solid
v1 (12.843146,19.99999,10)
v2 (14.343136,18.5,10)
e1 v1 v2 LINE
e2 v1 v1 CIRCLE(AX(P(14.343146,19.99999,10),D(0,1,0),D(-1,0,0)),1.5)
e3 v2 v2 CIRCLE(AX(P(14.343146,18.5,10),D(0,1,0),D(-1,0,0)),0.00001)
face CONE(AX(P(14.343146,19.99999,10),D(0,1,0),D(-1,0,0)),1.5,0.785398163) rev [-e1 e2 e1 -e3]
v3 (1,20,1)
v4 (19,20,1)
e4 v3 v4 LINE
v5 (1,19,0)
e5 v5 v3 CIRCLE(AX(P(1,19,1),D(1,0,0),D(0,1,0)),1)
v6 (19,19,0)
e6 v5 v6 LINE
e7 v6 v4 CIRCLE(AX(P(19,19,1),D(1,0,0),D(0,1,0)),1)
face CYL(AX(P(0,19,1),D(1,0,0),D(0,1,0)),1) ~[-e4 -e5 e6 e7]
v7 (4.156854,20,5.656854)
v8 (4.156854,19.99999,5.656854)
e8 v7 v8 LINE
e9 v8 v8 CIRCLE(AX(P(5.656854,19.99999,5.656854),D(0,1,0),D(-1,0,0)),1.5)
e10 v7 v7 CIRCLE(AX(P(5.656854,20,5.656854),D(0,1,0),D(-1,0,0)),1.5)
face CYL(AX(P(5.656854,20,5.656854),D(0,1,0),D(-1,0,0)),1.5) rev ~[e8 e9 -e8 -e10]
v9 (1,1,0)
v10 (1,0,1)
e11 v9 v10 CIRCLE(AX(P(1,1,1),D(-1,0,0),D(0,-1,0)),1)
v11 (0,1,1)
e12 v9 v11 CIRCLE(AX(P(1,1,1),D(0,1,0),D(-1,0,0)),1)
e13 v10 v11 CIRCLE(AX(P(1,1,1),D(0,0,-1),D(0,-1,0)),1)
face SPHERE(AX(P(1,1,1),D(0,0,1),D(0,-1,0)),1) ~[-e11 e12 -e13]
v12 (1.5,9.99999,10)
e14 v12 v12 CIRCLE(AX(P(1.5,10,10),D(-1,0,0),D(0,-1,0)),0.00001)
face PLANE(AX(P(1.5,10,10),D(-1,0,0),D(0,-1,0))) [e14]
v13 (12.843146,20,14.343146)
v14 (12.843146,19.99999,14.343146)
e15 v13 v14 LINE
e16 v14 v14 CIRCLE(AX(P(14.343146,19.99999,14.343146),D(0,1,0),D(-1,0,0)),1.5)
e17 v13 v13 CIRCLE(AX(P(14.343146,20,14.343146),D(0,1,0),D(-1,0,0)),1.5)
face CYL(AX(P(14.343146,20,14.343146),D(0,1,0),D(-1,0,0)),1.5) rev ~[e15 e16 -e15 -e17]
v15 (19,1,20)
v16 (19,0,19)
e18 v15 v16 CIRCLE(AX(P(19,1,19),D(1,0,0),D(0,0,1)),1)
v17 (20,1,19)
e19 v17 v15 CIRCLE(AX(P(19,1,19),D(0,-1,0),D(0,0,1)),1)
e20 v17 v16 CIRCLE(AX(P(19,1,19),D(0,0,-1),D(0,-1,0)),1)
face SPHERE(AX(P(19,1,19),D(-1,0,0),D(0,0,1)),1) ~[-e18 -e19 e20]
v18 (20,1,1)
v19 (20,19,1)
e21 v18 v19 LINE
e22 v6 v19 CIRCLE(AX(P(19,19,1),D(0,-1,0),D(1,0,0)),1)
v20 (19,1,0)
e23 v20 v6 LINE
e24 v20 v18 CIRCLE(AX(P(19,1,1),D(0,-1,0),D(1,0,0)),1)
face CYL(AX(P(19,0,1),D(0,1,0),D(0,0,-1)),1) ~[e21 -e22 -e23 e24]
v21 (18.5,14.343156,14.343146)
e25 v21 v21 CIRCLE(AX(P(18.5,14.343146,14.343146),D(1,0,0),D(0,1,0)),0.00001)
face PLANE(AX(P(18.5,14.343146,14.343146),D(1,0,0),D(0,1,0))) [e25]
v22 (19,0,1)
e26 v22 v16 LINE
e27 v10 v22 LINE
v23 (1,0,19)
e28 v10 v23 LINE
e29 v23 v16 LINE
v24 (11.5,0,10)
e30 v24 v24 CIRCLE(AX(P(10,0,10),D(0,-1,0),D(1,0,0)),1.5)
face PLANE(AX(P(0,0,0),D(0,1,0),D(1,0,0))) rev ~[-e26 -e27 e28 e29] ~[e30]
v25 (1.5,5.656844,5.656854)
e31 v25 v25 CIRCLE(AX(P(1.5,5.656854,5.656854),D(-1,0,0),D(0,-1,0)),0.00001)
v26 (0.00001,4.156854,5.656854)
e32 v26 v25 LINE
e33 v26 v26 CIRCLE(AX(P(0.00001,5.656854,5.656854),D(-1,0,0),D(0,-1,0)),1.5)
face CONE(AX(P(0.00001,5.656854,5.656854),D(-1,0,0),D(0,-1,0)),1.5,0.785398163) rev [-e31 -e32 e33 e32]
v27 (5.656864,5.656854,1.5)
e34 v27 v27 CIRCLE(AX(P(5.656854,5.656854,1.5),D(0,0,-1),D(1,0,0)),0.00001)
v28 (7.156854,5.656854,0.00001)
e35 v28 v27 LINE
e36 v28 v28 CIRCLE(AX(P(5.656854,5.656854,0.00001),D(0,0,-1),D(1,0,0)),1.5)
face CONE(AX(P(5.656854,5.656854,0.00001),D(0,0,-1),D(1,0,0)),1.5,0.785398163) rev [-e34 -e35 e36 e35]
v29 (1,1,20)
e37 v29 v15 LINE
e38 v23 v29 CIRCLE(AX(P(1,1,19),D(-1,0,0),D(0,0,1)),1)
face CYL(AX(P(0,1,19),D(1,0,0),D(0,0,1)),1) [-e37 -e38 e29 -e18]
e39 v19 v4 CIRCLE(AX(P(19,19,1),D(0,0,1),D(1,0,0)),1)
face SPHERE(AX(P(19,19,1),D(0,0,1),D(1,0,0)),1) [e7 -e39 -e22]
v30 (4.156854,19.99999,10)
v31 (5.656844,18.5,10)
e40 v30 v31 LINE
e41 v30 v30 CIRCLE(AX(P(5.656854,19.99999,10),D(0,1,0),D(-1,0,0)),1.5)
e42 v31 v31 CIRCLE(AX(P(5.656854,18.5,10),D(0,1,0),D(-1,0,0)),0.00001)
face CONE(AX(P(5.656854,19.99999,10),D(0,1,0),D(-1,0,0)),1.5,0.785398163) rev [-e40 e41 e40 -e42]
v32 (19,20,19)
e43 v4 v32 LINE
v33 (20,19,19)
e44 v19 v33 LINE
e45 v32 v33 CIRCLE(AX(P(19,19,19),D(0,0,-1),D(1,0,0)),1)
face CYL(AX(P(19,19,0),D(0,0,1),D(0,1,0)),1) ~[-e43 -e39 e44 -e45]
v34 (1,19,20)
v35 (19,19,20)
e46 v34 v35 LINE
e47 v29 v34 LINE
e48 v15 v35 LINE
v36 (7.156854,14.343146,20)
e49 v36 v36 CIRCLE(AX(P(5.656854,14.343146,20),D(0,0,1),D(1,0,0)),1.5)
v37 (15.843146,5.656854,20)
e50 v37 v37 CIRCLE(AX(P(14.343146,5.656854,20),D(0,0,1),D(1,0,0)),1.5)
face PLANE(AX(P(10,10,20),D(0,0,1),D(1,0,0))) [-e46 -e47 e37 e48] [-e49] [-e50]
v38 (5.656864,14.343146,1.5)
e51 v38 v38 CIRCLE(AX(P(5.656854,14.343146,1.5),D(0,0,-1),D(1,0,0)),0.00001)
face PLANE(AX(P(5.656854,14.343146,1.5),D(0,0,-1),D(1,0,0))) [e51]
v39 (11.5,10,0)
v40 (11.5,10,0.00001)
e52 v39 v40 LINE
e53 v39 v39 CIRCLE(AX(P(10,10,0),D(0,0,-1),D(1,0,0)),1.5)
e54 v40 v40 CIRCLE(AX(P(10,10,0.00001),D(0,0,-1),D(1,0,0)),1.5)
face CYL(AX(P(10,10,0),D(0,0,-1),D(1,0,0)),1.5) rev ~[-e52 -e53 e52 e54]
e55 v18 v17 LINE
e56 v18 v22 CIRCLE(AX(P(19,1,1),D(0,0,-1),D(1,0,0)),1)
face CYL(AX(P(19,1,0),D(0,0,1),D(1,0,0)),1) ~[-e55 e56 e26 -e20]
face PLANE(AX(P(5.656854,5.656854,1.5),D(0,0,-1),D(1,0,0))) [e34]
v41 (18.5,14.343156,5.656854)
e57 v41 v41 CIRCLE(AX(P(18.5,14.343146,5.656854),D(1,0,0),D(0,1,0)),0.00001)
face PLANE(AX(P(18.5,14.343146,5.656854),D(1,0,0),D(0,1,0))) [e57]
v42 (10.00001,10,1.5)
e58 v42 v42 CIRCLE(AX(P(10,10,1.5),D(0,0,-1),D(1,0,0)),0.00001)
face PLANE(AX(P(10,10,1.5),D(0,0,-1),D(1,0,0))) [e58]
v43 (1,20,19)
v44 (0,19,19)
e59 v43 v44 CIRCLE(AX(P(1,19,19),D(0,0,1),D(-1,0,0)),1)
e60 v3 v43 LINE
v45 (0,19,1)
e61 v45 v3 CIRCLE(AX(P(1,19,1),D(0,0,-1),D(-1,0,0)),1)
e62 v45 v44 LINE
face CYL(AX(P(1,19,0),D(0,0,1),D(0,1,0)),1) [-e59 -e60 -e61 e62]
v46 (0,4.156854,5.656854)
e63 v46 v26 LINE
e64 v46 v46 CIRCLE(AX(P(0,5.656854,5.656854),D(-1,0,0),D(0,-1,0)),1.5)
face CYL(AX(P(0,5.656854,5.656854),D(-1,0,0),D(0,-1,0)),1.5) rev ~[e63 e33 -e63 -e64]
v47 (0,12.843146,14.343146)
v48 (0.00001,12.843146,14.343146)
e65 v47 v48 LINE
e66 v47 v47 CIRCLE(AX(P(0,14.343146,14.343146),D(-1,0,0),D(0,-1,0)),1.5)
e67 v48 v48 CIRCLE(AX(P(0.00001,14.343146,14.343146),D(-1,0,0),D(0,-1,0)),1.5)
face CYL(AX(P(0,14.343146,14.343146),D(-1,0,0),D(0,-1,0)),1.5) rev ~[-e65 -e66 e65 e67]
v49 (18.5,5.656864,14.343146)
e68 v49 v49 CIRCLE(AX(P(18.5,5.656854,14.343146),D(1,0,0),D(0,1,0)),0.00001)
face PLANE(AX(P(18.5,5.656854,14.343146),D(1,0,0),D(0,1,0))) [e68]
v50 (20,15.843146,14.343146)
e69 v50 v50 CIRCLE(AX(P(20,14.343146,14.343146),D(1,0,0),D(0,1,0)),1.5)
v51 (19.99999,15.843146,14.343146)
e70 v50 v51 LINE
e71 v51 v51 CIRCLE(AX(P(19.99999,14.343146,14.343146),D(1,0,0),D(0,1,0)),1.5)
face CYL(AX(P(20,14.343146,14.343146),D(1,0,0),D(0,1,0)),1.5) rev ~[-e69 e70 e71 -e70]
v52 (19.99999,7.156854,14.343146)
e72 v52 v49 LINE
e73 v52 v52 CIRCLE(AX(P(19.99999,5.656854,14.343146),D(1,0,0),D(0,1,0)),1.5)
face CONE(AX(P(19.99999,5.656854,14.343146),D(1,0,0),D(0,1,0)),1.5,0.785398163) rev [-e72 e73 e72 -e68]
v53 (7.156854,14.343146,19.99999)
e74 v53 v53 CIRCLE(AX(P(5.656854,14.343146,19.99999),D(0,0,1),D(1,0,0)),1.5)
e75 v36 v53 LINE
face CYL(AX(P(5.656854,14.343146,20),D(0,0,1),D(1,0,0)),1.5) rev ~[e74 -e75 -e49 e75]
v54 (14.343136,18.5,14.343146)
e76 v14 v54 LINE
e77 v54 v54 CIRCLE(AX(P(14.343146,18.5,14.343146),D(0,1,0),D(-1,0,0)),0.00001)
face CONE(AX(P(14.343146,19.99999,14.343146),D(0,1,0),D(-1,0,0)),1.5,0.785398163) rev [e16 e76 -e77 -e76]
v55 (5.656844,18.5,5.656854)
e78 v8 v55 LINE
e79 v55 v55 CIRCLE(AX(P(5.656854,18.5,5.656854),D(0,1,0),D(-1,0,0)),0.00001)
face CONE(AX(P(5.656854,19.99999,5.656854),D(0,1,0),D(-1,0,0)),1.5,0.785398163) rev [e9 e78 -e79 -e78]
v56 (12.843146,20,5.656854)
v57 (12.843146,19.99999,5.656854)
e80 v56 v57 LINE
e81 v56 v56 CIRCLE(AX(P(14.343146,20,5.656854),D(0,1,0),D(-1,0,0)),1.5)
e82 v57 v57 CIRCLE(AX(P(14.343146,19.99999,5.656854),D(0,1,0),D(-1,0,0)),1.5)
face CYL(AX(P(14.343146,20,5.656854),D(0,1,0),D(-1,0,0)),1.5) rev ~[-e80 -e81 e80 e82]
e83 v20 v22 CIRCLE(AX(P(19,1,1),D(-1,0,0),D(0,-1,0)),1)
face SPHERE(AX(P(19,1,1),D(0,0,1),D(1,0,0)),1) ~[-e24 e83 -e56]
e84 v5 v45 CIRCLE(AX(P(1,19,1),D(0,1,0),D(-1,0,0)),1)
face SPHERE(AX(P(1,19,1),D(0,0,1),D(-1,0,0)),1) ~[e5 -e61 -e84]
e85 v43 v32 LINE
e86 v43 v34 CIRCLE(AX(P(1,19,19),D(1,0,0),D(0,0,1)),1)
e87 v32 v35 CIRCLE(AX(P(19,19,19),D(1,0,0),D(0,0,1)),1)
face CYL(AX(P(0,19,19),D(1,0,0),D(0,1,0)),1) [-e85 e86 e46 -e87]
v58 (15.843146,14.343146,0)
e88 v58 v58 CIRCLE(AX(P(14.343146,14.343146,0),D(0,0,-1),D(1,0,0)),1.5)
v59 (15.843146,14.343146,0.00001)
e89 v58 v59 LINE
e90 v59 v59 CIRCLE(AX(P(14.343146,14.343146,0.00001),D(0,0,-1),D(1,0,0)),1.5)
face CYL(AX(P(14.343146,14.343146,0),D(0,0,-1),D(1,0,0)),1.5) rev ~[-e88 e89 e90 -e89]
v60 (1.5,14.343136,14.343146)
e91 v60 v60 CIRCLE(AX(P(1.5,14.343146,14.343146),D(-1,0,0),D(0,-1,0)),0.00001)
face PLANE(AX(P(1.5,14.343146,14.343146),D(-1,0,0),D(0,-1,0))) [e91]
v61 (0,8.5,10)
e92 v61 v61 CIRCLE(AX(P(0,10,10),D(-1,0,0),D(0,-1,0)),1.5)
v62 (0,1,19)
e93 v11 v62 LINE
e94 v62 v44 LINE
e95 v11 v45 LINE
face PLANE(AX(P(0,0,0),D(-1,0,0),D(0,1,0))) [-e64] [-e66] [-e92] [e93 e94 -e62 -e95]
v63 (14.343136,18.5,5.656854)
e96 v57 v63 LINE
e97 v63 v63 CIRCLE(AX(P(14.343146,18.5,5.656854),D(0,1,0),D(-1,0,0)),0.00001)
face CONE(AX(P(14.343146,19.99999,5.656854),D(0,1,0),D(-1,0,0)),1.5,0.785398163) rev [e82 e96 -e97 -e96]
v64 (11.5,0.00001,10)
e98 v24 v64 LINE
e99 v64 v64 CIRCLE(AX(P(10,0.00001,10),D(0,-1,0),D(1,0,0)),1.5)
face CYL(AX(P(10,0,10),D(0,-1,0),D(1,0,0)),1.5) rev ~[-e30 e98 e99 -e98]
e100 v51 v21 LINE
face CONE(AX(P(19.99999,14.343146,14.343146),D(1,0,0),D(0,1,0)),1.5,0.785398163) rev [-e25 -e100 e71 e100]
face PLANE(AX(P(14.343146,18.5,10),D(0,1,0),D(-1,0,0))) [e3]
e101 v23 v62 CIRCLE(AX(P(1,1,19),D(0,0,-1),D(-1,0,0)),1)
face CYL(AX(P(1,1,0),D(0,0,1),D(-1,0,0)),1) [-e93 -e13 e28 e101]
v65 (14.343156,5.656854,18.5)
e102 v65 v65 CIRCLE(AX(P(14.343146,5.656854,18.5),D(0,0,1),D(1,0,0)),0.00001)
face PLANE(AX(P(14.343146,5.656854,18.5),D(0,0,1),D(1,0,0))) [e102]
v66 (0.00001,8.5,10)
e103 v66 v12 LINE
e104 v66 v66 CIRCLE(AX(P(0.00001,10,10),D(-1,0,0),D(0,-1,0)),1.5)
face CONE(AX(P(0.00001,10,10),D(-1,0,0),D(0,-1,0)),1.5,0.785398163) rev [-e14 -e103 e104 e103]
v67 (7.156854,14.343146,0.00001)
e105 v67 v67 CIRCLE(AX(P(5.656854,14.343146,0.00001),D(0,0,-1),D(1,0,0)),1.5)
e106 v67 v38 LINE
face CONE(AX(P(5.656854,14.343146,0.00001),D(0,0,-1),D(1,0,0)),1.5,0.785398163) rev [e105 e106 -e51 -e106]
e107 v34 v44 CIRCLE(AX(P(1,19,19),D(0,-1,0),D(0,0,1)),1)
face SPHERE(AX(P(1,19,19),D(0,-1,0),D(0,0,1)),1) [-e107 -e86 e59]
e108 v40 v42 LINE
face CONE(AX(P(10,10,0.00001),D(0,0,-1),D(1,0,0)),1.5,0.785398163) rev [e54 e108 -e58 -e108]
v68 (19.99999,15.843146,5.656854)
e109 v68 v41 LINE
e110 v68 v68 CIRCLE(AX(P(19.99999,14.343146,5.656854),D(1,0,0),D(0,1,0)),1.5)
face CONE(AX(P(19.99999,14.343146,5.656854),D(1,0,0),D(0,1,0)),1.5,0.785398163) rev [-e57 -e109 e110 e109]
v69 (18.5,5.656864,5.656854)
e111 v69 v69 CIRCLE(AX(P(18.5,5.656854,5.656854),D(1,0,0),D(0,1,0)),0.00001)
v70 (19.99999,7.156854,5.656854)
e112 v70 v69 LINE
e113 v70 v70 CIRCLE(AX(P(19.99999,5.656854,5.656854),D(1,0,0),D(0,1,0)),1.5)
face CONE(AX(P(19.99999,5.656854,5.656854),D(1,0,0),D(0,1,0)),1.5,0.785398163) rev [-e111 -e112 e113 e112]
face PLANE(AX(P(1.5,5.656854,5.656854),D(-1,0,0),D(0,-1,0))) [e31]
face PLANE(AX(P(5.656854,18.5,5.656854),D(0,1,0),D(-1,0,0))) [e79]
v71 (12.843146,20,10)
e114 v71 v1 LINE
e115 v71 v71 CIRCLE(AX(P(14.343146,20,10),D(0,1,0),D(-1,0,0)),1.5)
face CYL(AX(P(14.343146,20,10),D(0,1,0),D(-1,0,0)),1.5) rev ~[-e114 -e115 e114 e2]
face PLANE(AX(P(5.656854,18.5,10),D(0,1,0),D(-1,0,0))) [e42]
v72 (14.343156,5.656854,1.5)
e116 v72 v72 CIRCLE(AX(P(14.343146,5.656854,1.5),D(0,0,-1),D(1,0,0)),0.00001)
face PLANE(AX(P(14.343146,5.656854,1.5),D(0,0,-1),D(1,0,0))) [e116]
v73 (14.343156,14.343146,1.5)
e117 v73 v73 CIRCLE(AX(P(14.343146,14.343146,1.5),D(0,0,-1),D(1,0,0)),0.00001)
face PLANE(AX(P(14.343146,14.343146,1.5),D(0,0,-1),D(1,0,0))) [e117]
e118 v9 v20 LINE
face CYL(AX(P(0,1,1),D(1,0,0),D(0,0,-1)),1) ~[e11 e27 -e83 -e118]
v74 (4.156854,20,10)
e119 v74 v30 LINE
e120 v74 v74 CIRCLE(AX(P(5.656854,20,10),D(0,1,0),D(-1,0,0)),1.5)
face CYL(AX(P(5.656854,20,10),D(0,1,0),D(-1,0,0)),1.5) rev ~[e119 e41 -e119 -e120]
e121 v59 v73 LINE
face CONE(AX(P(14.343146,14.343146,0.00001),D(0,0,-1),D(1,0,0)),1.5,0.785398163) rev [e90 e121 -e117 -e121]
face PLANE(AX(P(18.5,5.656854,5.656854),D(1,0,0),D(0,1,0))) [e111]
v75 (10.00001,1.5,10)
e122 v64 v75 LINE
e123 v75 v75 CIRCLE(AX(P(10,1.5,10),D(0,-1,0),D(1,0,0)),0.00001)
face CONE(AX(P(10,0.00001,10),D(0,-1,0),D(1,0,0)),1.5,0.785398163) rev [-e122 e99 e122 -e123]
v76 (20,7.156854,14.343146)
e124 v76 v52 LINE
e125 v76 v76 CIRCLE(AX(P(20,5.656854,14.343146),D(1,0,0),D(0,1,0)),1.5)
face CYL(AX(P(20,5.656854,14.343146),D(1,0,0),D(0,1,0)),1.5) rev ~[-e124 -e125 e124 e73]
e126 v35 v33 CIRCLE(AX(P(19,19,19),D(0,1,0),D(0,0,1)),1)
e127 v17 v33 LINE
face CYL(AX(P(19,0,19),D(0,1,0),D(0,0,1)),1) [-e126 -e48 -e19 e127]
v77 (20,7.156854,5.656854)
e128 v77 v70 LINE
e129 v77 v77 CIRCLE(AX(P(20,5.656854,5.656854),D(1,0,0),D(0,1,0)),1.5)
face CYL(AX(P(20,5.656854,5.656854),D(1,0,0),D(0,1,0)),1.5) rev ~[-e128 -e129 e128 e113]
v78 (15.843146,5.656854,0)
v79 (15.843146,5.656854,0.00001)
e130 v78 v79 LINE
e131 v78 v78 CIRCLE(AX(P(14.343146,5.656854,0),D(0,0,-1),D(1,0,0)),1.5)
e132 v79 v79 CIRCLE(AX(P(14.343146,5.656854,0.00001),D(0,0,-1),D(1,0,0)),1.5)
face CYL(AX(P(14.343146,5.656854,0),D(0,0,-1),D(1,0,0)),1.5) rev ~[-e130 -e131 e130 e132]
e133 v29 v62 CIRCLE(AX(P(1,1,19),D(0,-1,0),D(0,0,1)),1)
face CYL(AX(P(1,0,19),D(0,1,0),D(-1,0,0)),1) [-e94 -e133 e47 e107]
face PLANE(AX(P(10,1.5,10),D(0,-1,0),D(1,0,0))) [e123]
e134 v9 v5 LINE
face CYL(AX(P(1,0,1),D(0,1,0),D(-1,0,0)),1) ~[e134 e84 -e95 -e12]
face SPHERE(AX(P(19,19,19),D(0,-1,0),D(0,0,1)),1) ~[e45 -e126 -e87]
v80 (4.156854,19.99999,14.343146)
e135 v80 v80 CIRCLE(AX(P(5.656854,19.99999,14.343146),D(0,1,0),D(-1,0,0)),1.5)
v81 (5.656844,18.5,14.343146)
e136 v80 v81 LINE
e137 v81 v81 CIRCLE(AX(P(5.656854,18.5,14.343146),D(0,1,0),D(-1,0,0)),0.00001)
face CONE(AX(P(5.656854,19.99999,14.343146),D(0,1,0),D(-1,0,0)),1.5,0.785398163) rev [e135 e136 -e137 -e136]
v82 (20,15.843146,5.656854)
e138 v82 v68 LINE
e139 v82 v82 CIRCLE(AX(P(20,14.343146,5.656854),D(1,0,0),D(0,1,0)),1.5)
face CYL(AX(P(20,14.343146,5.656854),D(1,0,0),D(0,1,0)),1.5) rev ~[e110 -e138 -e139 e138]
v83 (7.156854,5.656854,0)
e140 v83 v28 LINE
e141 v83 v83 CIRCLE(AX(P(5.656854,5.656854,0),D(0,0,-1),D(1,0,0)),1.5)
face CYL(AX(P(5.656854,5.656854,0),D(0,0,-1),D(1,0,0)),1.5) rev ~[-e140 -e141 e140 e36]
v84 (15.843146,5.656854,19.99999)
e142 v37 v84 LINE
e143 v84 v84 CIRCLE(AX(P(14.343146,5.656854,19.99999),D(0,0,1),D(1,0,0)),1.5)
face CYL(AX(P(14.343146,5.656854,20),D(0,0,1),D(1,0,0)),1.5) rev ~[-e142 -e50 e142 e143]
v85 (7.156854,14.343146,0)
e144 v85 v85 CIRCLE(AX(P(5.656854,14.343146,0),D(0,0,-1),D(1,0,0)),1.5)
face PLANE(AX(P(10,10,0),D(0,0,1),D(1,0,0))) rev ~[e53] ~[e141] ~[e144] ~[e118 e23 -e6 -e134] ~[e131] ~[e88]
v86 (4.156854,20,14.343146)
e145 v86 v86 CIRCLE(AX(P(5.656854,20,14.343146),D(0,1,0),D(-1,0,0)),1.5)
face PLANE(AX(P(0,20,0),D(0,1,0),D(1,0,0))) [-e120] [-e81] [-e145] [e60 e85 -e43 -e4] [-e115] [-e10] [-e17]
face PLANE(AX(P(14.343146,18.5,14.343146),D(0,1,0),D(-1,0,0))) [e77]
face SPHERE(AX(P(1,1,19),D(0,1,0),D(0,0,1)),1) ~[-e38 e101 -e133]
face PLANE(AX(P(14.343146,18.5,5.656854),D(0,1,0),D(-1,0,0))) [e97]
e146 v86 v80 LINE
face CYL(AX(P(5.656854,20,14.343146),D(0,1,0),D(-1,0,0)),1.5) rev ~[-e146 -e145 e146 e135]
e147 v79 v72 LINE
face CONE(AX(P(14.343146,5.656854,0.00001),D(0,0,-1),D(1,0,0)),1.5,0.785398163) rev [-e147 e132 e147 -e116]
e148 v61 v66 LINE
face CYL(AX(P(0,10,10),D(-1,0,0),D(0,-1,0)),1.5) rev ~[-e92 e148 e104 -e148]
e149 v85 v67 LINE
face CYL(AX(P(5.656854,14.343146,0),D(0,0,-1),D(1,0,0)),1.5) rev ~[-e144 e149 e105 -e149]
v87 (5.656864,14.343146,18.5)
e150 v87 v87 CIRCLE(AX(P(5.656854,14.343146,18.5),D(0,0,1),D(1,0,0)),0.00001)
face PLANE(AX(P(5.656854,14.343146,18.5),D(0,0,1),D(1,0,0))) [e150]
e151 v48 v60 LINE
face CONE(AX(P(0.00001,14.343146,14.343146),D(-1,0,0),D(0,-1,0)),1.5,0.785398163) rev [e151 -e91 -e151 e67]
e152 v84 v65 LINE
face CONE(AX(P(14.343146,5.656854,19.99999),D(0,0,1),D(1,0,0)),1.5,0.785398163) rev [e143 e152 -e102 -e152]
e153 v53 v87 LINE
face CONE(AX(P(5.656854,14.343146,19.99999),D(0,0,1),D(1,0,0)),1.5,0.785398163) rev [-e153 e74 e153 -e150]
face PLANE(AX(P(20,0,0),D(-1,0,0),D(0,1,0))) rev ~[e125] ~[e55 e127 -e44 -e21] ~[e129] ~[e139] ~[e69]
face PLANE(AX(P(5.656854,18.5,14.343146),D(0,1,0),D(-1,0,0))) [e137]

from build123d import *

# Parameters (mm, degrees)
F0_W      = 20
F0_H      = 20
F1_DEPTH  = 20
F2_R      = 1.5
F3_DEPTH  = 1.5
F4_SIZE   = 1.49999
F5_R      = 1.5
F6_DEPTH  = 1.5
F7_SIZE   = 1.49999
F8_SIZE   = 1.49999
F9_R      = 1.5
F10_DEPTH = 1.5
F11_SIZE  = 1.49999
F12_R     = 1.5
F13_DEPTH = 1.5
F14_SIZE  = 1.49999
F15_R     = 1.5
F16_DEPTH = 1.5
F17_SIZE  = 1.49999
F18_R     = 1.5
F19_DEPTH = 1.5
F20_SIZE  = 1.49999
F21_R     = 1


# Not quite as in the source:
# - a fillet or chamfer is up to 0.001 mm smaller than in the source, because OpenCascade refuses the exact size


with BuildPart() as f1:
    # F0 (on Top) → F1 (new body)
    with BuildSketch(Plane.XY):
        with Locations((10, 10)):
            Rectangle(F0_W, F0_H)
    extrude(amount=F1_DEPTH)

    # F2 (on face) → F3 (cut)
    with BuildSketch(Plane.XZ):
        with Locations((10, 10)):
            Circle(F2_R)
    extrude(amount=-F3_DEPTH, mode=Mode.SUBTRACT)

    # F4 (size 1.5 in the source; OpenCascade refuses exactly that, so slightly less here)
    f4_edges = [f1.edges().sort_by_distance(p)[0] for p in [
        (8.5, 1.5, 10),
    ]]
    chamfer(f4_edges, length=F4_SIZE)

    # F5 (on face) → F6 (cut)
    with BuildSketch(Plane.XY.offset(20)):
        with Locations((5.6568542495, 14.3431457505)):
            Circle(F5_R)
        with Locations((14.3431457505, 5.6568542495)):
            Circle(F5_R)
    extrude(amount=-F6_DEPTH, mode=Mode.SUBTRACT)

    # F7 (size 1.5 in the source; OpenCascade refuses exactly that, so slightly less here)
    f7_edges = [f1.edges().sort_by_distance(p)[0] for p in [
        (4.156854, 14.343146, 18.5),
    ]]
    chamfer(f7_edges, length=F7_SIZE)

    # F8 (size 1.5 in the source; OpenCascade refuses exactly that, so slightly less here)
    f8_edges = [f1.edges().sort_by_distance(p)[0] for p in [
        (12.843146, 5.656854, 18.5),
    ]]
    chamfer(f8_edges, length=F8_SIZE)

    # F9 (on face) → F10 (cut)
    with BuildSketch(Plane(origin=(0, 0, 0), x_dir=(0, -1, 0), z_dir=(-1, 0, 0))):
        with Locations((-14.3431457505, 14.3431457505)):
            Circle(F9_R)
        with Locations((-10, 10)):
            Circle(F9_R)
        with Locations((-5.6568542495, 5.6568542495)):
            Circle(F9_R)
    extrude(amount=-F10_DEPTH, mode=Mode.SUBTRACT)

    # F11 (size 1.5 in the source; OpenCascade refuses exactly that, so slightly less here)
    f11_edges = [f1.edges().sort_by_distance(p)[0] for p in [
        (1.5, 15.843146, 14.343146),
        (1.5, 11.5, 10),
        (1.5, 7.156854, 5.656854),
    ]]
    chamfer(f11_edges, length=F11_SIZE)

    # F12 (on face) → F13 (cut)
    with BuildSketch(Plane.YZ.offset(20)):
        with Locations((5.6568542495, 14.3431457505)):
            Circle(F12_R)
        with Locations((14.3431457505, 14.3431457505)):
            Circle(F12_R)
        with Locations((14.3431457505, 5.6568542495)):
            Circle(F12_R)
        with Locations((5.6568542495, 5.6568542495)):
            Circle(F12_R)
    extrude(amount=-F13_DEPTH, mode=Mode.SUBTRACT)

    # F14 (size 1.5 in the source; OpenCascade refuses exactly that, so slightly less here)
    f14_edges = [f1.edges().sort_by_distance(p)[0] for p in [
        (18.5, 4.156854, 14.343146),
        (18.5, 12.843146, 14.343146),
        (18.5, 12.843146, 5.656854),
        (18.5, 4.156854, 5.656854),
    ]]
    chamfer(f14_edges, length=F14_SIZE)

    # F15 (on face) → F16 (cut)
    with BuildSketch(Plane(origin=(0, 0, 0), x_dir=(1, 0, 0), z_dir=(0, 0, -1))):
        with Locations((5.6568542495, -5.6568542495)):
            Circle(F15_R)
        with Locations((10, -10)):
            Circle(F15_R)
        with Locations((14.3431457505, -5.6568542495)):
            Circle(F15_R)
        with Locations((14.3431457505, -14.3431457505)):
            Circle(F15_R)
        with Locations((5.6568542495, -14.3431457505)):
            Circle(F15_R)
    extrude(amount=-F16_DEPTH, mode=Mode.SUBTRACT)

    # F17 (size 1.5 in the source; OpenCascade refuses exactly that, so slightly less here)
    f17_edges = [f1.edges().sort_by_distance(p)[0] for p in [
        (4.156854, 5.656854, 1.5),
        (12.843146, 5.656854, 1.5),
        (8.5, 10, 1.5),
        (4.156854, 14.343146, 1.5),
        (12.843146, 14.343146, 1.5),
    ]]
    chamfer(f17_edges, length=F17_SIZE)

    # F18 (on face) → F19 (cut)
    with BuildSketch(Plane(origin=(0, 20, 0), x_dir=(-1, 0, 0), z_dir=(0, 1, 0))):
        with Locations((-14.3431457505, 14.3431457505)):
            Circle(F18_R)
        with Locations((-5.6568542495, 14.3431457505)):
            Circle(F18_R)
        with Locations((-5.6568542495, 10)):
            Circle(F18_R)
        with Locations((-14.3431457505, 10)):
            Circle(F18_R)
        with Locations((-14.3431457505, 5.6568542495)):
            Circle(F18_R)
        with Locations((-5.6568542495, 5.6568542495)):
            Circle(F18_R)
    extrude(amount=-F19_DEPTH, mode=Mode.SUBTRACT)

    # F20 (size 1.5 in the source; OpenCascade refuses exactly that, so slightly less here)
    f20_edges = [f1.edges().sort_by_distance(p)[0] for p in [
        (15.843146, 18.5, 14.343146),
        (7.156854, 18.5, 14.343146),
        (7.156854, 18.5, 10),
        (15.843146, 18.5, 10),
        (15.843146, 18.5, 5.656854),
        (7.156854, 18.5, 5.656854),
    ]]
    chamfer(f20_edges, length=F20_SIZE)

    # F21
    f21_edges = [f1.edges().sort_by_distance(p)[0] for p in [
        (0, 10, 20),
        (10, 0, 20),
        (20, 10, 20),
        (10, 20, 20),
        (20, 20, 10),
        (20, 0, 10),
        (0, 0, 10),
        (20, 10, 0),
        (10, 0, 0),
        (0, 20, 10),
        (0, 10, 0),
        (10, 20, 0),
    ]]
    fillet(f21_edges, radius=F21_R)


solid = f1.part
